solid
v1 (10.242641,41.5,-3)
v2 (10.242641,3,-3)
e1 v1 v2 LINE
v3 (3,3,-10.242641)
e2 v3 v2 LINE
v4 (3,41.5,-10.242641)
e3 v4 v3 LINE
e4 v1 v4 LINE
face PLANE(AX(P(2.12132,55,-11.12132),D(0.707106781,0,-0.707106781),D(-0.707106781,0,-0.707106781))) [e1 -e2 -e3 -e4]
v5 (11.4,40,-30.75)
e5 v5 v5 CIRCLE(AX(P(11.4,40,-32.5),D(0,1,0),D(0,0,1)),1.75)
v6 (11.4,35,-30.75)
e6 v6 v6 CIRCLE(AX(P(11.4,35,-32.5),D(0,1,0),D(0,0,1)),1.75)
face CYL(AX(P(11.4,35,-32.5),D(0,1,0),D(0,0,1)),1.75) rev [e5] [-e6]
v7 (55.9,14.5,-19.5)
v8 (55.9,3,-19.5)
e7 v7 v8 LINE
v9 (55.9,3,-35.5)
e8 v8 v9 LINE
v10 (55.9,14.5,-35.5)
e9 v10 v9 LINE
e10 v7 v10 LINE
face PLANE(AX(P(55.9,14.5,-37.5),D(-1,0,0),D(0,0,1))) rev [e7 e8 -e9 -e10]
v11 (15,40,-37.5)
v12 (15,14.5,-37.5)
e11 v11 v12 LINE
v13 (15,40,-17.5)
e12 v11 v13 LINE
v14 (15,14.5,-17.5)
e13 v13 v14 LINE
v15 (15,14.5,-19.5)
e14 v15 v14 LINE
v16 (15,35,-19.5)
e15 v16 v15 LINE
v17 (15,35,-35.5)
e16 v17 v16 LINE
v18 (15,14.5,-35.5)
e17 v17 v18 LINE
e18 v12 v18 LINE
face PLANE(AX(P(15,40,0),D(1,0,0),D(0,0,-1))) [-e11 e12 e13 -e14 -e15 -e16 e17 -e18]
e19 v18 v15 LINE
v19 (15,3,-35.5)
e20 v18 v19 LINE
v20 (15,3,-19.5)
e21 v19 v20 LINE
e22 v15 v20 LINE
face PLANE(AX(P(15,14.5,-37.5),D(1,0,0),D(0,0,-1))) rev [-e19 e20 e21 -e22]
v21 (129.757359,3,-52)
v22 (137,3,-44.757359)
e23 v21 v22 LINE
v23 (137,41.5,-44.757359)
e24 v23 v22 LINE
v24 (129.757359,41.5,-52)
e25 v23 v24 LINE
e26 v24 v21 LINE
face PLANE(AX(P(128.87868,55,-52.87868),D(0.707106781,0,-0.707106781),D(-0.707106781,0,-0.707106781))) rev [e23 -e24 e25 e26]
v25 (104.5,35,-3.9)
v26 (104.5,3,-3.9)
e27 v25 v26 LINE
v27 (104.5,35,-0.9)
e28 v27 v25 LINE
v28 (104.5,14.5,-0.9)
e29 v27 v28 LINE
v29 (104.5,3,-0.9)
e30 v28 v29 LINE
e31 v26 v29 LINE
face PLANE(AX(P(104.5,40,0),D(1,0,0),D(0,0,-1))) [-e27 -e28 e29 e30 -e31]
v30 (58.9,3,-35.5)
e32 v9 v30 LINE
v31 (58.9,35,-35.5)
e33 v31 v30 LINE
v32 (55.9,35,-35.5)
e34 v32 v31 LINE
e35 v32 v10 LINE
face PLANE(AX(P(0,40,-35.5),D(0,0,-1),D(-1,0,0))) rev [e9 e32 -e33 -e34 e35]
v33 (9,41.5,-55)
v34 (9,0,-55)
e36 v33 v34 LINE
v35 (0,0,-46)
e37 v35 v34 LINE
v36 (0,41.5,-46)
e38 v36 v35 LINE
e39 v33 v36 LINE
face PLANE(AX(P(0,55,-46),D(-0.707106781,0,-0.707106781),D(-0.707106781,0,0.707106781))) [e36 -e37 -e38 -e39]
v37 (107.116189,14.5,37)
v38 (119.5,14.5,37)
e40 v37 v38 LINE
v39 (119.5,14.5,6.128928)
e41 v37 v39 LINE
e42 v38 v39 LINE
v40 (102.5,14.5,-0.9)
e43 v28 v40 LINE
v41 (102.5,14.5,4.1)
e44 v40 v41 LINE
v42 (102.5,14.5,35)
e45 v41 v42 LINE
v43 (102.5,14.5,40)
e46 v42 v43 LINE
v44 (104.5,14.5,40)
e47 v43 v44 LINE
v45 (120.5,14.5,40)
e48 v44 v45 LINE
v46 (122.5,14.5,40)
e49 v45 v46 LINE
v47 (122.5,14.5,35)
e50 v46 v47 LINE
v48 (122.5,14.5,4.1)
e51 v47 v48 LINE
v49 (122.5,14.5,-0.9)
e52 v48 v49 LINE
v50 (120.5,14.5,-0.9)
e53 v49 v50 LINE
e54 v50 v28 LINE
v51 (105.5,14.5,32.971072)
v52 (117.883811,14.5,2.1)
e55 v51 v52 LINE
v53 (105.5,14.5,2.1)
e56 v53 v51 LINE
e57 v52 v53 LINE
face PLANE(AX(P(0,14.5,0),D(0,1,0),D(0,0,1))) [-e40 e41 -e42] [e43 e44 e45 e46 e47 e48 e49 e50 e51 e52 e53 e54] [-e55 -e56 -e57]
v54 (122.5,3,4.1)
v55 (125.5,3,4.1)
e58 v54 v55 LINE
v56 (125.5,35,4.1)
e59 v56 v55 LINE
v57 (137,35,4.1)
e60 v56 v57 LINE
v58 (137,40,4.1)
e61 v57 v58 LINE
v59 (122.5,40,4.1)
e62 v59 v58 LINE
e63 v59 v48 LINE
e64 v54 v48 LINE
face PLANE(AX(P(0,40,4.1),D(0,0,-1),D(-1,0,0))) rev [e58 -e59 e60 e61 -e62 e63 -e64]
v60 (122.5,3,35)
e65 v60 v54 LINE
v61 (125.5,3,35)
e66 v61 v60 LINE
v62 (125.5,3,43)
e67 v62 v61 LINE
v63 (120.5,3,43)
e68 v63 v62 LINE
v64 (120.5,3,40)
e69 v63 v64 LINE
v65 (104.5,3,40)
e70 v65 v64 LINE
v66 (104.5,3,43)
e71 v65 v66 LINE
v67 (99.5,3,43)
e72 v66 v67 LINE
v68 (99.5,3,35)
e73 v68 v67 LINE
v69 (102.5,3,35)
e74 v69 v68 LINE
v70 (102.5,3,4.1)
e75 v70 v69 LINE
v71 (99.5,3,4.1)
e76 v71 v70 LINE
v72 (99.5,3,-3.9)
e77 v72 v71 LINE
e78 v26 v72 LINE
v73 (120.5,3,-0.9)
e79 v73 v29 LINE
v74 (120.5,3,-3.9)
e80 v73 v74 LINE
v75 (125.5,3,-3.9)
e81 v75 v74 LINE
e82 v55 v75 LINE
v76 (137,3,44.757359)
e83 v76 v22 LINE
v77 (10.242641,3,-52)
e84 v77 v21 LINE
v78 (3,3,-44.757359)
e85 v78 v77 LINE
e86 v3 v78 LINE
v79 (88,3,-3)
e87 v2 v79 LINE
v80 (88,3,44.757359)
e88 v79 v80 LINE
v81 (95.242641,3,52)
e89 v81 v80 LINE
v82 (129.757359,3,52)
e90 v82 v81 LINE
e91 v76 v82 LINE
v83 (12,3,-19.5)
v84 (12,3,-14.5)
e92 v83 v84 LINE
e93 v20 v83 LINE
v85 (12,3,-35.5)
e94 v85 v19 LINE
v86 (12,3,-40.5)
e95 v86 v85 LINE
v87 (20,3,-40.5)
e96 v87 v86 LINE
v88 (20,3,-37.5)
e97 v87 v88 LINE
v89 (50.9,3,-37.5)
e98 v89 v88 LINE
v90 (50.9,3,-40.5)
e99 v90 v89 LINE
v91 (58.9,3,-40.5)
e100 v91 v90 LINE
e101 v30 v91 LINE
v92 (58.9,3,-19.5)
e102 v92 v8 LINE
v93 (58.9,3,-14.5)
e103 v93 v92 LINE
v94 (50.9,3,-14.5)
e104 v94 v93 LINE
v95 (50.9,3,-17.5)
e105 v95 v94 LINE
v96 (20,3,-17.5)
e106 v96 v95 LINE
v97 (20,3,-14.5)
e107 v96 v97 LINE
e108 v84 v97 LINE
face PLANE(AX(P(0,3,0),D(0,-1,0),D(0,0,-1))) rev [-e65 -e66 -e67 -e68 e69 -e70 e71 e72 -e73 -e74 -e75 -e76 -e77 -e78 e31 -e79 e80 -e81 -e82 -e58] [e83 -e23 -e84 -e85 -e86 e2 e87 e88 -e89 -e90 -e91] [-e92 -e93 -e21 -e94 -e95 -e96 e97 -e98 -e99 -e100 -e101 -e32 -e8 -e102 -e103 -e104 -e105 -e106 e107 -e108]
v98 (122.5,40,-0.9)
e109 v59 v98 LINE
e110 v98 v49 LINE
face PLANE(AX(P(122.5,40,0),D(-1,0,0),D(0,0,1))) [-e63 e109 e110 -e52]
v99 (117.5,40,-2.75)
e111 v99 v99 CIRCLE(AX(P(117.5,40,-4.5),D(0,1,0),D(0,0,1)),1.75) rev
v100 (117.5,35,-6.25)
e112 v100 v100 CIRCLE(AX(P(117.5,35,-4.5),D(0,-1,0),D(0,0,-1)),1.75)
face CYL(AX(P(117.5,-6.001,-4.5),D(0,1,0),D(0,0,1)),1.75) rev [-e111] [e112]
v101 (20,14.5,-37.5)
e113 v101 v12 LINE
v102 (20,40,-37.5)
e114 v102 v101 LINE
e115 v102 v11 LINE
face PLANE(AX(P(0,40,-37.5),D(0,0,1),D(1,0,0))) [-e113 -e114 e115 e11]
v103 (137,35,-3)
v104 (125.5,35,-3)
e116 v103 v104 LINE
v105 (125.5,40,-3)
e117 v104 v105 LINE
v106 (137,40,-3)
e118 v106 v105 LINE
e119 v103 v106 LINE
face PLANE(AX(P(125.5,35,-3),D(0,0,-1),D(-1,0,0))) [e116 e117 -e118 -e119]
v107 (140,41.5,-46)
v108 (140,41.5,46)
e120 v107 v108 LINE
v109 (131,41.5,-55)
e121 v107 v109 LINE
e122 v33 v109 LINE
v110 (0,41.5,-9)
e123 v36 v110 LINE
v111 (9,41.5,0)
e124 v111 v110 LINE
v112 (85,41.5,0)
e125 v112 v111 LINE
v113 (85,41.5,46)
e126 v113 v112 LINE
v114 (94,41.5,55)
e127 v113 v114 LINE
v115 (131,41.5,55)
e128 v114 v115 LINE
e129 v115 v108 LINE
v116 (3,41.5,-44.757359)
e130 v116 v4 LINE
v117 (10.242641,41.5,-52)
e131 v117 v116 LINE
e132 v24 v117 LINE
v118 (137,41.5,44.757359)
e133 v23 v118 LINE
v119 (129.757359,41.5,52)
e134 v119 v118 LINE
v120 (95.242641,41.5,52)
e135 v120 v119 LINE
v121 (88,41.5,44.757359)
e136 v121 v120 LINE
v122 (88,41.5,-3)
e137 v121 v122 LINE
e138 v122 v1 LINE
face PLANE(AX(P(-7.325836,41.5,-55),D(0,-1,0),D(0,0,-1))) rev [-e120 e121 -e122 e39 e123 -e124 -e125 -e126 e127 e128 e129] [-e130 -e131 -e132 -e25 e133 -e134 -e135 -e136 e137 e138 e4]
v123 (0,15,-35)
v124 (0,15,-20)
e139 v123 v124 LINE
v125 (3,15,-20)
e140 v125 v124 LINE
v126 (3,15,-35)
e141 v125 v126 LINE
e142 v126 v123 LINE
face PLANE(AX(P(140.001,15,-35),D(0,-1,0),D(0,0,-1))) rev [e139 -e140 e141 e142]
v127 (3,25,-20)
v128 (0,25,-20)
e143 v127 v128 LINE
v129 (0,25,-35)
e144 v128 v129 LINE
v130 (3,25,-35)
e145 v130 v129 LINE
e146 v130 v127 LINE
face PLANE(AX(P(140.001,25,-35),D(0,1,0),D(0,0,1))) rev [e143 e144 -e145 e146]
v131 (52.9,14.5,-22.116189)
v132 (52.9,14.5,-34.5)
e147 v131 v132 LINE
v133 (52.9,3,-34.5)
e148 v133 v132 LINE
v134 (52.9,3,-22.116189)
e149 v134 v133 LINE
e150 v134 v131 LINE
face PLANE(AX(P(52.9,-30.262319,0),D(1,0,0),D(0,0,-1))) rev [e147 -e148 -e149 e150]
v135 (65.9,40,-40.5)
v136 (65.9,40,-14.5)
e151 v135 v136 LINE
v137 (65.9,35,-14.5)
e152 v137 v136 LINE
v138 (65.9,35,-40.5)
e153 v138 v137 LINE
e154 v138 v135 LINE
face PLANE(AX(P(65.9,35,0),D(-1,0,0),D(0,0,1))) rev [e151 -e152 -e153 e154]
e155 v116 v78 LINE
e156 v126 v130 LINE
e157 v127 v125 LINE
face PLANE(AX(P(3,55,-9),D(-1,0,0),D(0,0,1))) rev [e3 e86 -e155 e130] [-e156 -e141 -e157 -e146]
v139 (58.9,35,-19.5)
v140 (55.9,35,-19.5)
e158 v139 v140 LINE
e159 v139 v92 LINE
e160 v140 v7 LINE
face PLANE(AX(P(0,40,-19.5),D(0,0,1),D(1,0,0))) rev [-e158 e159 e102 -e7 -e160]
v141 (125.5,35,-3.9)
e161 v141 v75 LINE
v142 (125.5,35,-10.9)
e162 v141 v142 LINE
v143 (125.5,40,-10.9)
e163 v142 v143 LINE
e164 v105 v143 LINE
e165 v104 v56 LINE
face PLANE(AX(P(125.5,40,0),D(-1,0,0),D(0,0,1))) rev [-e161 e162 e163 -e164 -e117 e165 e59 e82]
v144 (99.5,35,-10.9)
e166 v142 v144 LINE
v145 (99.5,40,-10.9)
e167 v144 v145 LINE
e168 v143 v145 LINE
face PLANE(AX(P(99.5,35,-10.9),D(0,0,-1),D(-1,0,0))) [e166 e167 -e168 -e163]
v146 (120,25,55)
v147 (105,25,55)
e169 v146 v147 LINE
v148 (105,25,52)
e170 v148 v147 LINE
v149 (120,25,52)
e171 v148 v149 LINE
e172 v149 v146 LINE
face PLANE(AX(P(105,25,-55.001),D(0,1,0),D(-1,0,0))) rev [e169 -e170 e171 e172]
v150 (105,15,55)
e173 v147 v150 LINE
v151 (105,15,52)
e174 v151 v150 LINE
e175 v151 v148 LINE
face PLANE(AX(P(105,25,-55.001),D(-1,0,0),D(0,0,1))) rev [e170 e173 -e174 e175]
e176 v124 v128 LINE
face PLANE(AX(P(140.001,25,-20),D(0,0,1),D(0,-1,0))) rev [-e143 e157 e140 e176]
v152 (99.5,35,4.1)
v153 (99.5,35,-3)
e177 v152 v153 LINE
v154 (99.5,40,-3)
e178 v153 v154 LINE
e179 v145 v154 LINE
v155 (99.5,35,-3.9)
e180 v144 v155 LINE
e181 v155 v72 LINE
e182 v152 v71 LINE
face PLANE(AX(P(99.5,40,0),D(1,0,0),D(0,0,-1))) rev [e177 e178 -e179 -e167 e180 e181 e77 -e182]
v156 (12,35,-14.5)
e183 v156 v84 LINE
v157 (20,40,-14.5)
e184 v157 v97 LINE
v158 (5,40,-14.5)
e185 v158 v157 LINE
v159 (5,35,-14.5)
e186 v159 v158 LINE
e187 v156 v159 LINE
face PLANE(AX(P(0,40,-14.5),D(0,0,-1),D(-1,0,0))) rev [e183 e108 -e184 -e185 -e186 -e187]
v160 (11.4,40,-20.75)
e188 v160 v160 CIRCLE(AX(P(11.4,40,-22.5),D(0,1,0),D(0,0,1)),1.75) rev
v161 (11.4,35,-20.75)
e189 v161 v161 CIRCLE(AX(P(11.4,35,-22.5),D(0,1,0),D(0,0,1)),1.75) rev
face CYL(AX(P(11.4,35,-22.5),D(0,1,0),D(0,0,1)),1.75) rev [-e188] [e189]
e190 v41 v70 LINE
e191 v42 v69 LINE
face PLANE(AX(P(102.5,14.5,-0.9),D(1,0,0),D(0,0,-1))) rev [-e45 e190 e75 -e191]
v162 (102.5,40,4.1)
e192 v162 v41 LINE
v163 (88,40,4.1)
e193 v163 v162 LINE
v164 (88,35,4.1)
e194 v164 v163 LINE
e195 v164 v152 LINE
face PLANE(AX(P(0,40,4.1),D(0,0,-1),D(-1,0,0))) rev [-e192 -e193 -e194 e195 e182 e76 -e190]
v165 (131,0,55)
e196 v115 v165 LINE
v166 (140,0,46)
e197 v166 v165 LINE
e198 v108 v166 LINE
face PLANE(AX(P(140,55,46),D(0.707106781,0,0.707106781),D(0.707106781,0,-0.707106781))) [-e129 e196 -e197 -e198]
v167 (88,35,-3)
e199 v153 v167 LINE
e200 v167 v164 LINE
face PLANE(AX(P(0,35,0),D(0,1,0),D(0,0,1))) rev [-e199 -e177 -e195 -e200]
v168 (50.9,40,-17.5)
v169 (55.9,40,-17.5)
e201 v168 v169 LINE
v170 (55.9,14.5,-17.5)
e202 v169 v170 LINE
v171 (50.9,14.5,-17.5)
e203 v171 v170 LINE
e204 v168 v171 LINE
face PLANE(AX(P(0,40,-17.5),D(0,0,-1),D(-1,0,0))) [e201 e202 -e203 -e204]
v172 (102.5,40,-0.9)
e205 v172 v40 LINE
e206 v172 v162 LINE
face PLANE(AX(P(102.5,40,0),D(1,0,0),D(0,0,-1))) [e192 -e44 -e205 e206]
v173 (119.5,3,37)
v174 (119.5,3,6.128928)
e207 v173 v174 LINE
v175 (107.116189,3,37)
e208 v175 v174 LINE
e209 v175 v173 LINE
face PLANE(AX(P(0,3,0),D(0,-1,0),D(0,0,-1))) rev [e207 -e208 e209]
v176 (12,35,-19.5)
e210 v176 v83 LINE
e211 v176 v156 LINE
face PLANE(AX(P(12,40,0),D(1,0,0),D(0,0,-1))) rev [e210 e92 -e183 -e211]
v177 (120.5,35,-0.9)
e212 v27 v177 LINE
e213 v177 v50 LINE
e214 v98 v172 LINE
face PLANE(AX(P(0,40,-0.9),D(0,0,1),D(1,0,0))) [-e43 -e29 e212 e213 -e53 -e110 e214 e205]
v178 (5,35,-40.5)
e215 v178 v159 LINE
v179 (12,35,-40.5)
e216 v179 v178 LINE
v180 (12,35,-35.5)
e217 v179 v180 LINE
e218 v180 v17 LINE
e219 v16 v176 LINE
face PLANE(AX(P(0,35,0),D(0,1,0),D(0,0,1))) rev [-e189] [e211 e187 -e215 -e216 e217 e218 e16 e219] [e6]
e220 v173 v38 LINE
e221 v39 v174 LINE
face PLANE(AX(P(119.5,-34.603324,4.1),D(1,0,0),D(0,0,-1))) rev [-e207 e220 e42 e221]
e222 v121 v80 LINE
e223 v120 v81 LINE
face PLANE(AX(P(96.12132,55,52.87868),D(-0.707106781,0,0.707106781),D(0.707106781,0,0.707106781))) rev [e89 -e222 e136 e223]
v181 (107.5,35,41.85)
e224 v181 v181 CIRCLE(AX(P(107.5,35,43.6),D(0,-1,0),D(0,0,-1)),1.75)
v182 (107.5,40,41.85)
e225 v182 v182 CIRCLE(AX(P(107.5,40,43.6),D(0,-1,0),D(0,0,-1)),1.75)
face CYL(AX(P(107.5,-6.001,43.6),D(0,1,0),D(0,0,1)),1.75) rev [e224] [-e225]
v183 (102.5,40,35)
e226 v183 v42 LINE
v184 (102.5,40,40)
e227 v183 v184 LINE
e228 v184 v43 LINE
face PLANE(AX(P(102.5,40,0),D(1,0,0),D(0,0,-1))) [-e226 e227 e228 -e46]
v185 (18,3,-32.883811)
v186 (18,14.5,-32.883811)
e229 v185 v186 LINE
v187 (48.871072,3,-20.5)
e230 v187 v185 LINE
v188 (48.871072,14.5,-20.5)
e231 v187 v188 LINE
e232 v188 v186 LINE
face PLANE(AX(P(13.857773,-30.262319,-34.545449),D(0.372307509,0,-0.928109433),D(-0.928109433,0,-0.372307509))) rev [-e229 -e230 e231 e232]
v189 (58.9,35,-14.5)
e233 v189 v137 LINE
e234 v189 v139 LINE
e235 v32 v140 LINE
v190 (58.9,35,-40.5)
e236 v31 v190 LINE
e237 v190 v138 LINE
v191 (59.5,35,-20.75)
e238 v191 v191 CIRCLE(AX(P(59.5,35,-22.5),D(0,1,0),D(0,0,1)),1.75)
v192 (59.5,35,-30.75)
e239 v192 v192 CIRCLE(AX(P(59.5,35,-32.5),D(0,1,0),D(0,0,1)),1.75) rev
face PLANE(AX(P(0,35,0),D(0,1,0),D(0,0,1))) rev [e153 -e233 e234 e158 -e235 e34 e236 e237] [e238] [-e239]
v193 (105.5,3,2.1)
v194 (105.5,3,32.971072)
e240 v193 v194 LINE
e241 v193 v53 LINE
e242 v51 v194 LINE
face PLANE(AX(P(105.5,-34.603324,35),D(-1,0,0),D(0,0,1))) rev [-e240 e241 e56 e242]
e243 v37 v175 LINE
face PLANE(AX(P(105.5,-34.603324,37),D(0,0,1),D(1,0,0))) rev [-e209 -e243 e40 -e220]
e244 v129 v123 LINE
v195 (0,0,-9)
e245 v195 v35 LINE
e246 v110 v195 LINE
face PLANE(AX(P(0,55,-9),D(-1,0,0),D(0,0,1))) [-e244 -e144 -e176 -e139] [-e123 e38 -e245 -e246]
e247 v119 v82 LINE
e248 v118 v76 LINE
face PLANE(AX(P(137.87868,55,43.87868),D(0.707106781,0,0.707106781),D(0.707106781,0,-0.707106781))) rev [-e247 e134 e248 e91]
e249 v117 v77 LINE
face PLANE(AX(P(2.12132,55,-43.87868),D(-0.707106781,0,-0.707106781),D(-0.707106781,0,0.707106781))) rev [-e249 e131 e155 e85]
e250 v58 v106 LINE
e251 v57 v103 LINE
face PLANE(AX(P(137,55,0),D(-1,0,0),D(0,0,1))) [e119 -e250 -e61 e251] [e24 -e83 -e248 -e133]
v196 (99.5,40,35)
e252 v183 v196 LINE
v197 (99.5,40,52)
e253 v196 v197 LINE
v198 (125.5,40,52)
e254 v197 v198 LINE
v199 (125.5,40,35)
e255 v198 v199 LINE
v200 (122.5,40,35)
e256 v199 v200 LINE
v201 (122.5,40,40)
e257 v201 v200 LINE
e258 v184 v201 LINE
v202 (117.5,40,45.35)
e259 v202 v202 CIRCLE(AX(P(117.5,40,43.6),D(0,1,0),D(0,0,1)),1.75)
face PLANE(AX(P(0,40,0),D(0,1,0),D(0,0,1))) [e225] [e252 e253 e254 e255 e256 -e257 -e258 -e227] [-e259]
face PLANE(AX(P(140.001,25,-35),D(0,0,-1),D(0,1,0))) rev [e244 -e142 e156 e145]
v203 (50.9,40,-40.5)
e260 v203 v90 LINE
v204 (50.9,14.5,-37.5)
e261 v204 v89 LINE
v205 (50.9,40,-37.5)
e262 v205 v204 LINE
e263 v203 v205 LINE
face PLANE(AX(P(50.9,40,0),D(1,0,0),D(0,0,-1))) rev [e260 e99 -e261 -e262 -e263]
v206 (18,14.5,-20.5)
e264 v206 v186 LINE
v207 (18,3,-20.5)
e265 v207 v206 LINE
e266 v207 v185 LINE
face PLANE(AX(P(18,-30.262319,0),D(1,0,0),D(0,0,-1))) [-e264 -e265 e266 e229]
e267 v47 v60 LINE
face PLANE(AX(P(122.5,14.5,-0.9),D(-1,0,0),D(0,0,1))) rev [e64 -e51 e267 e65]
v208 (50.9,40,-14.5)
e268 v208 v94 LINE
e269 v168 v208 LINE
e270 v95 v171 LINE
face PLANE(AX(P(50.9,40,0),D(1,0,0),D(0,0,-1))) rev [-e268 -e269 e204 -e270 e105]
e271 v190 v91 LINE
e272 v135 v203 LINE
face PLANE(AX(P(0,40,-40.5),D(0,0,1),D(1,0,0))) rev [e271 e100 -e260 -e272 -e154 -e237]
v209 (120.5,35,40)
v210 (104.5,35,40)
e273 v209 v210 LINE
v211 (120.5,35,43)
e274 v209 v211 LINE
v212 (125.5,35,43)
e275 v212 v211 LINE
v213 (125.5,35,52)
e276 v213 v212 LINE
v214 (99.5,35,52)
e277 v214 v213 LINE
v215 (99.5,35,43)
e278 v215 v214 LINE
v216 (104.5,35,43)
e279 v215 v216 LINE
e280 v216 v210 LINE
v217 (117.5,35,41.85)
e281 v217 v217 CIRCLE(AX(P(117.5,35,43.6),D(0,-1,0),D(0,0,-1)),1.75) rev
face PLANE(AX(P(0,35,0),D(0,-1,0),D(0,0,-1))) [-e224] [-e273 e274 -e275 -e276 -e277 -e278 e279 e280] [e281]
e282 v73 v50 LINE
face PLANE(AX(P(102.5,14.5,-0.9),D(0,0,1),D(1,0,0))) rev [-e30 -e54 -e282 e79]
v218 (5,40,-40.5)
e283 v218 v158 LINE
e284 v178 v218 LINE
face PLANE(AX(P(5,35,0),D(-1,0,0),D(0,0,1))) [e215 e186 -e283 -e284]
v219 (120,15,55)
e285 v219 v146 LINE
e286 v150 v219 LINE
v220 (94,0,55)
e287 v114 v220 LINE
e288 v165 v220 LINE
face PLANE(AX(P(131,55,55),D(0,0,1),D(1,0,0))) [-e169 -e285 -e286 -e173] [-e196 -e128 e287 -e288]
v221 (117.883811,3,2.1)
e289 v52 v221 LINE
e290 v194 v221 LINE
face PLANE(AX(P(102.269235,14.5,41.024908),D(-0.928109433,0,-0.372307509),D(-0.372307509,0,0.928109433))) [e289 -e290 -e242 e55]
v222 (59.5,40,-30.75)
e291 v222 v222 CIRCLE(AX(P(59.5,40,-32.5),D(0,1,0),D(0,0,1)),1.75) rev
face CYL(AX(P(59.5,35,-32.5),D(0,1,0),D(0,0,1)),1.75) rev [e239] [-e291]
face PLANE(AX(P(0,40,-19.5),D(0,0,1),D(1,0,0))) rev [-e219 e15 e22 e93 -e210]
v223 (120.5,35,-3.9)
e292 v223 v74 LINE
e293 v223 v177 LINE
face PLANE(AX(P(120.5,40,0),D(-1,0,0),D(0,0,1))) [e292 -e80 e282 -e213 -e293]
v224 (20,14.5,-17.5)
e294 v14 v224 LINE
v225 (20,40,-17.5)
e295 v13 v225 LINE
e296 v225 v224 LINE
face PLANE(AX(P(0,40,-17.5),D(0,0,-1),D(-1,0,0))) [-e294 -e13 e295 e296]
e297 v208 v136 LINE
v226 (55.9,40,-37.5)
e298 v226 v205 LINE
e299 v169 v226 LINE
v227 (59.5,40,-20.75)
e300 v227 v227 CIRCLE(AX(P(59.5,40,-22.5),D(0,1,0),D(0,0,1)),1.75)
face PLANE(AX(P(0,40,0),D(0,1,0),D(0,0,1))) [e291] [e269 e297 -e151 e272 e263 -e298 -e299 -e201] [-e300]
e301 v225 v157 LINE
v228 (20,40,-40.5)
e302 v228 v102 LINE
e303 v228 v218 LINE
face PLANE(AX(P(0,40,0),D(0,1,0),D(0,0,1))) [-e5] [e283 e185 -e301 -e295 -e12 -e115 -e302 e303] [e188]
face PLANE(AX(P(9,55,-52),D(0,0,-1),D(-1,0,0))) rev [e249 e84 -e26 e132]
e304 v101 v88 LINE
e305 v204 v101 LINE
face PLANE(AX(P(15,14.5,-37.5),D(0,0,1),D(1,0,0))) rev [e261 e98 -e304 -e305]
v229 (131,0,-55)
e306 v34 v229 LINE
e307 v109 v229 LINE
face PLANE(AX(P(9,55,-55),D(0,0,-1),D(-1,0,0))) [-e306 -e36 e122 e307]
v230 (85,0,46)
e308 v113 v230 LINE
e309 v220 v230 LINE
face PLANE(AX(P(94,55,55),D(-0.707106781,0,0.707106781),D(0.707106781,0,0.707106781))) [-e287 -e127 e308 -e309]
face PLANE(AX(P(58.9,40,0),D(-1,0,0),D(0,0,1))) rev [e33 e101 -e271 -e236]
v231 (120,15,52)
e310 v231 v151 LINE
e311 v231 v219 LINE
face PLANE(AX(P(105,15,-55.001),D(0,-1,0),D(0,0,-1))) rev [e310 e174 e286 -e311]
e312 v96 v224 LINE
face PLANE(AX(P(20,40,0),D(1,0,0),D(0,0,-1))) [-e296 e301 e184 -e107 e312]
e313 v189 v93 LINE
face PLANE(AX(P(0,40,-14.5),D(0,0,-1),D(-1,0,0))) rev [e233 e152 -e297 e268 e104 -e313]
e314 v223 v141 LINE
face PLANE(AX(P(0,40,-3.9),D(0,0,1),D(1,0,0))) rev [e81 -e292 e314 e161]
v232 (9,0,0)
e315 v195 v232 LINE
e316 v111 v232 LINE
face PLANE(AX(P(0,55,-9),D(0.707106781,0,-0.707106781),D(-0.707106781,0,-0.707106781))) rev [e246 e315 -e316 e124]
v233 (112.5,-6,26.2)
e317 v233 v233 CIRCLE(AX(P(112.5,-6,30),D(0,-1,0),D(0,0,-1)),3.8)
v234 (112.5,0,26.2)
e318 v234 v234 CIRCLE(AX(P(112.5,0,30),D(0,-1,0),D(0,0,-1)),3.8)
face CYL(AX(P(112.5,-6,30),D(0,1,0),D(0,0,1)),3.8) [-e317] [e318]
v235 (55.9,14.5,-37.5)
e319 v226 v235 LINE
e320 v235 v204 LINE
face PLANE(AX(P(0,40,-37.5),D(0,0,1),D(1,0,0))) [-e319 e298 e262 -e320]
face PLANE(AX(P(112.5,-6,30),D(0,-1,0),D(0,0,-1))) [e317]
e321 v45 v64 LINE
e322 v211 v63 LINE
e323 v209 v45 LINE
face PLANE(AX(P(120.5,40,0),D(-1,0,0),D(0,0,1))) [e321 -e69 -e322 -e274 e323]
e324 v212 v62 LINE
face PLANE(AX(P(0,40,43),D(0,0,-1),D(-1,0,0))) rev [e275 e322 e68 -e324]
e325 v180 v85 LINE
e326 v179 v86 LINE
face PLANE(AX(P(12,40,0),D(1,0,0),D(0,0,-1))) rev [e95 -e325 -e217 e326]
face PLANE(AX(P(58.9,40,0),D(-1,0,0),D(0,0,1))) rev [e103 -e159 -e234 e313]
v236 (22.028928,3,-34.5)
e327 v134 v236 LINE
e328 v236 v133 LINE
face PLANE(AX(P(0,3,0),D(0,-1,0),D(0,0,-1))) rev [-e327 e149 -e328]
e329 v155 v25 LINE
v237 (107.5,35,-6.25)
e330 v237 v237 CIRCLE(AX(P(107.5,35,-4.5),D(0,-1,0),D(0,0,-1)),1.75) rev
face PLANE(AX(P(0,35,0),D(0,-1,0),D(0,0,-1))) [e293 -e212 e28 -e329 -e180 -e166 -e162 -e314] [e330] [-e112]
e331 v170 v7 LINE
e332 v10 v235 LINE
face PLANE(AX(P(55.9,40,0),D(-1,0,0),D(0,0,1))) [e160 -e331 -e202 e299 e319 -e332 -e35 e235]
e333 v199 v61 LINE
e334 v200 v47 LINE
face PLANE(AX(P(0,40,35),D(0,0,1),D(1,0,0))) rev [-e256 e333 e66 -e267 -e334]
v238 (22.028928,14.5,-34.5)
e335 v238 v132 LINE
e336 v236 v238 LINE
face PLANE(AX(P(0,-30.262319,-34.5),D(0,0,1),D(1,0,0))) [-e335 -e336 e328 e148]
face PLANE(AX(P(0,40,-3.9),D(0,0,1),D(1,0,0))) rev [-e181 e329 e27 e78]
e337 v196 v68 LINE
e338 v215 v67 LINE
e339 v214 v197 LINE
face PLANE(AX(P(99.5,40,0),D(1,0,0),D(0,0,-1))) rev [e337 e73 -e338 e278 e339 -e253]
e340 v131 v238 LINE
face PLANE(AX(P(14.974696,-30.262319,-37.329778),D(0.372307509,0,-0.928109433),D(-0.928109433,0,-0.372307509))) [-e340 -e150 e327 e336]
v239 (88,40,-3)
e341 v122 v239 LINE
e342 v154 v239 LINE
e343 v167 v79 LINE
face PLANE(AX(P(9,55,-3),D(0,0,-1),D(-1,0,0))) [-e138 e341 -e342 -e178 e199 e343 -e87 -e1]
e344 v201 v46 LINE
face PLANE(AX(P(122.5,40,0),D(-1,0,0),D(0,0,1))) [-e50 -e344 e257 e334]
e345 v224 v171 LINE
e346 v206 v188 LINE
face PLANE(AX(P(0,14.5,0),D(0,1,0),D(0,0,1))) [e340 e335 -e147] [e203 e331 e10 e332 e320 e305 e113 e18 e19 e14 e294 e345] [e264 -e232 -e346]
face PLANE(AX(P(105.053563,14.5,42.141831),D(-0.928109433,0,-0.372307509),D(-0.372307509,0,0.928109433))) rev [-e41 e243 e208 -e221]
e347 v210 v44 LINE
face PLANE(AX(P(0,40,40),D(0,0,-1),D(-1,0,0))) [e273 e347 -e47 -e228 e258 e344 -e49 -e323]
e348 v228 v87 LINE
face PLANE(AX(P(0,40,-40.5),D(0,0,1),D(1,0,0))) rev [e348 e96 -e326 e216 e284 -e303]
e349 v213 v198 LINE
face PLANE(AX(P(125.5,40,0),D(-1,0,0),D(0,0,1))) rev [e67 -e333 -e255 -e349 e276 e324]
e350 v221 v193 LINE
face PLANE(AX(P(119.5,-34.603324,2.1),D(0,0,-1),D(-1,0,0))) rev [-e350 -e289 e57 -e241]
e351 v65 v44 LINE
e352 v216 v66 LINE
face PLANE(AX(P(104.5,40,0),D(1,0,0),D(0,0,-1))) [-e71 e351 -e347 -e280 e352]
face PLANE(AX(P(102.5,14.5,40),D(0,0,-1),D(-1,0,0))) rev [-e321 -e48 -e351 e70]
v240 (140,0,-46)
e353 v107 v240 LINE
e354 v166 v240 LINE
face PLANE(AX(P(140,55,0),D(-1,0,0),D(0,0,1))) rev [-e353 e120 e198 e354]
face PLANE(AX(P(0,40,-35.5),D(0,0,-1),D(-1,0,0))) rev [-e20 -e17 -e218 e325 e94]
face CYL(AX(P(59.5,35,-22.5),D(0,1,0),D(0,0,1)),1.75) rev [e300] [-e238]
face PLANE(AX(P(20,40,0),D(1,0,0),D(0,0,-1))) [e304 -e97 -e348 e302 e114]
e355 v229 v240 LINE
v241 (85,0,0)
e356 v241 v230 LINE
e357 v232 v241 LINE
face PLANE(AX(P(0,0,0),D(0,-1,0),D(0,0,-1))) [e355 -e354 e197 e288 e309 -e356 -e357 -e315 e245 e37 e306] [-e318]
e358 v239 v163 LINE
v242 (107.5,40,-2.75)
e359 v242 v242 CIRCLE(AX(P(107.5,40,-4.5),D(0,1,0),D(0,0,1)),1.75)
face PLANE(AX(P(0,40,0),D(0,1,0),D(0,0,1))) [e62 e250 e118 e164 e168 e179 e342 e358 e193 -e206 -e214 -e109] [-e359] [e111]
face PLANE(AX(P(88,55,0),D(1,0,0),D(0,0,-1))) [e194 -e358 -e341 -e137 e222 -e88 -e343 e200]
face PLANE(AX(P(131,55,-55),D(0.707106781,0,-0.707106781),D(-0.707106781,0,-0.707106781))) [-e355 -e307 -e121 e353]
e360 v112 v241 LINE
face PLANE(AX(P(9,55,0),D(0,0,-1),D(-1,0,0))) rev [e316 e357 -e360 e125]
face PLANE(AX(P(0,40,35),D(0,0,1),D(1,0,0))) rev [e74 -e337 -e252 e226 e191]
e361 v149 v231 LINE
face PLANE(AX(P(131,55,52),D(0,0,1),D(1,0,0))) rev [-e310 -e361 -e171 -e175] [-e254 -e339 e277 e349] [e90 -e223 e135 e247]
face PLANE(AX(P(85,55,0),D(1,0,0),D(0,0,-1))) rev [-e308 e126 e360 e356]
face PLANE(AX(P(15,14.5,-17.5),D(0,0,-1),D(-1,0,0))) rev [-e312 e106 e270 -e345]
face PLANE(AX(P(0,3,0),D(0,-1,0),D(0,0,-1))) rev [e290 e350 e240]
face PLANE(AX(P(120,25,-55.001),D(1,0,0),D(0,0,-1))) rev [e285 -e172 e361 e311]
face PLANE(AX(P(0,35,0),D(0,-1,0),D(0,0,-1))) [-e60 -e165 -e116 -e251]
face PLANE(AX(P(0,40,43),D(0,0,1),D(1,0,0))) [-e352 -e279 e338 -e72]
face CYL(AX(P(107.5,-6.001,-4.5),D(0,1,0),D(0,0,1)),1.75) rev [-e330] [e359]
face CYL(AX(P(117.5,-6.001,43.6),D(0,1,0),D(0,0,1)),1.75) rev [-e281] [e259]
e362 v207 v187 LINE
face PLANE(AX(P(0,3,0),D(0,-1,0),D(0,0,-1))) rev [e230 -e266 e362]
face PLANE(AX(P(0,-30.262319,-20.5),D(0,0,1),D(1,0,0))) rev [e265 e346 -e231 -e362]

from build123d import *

# Parameters (mm, degrees)
BOSS_EXTRUDE1_DEPTH     = 55
SHELL1_START            = 3
SHELL1_DEPTH            = 49
CUT_EXTRUDE1_DEPTH      = 161.15617378
CUT_EXTRUDE1_DEPTH_BACK = 161.15617378
SKETCH4_W               = 154.651671352
SKETCH4_H               = 22.597591031
SKETCH6_R               = 3.8
BOSS_EXTRUDE2_DEPTH     = 6
BOSS_EXTRUDE3_DEPTH     = 37
SKETCH9_W               = 26
SKETCH9_H               = 10
BOSS_EXTRUDE4_DEPTH     = 5
CUT_EXTRUDE3_REACH      = 159.293
SKETCH10_R              = 1.75
SKETCH11_W              = 26
SKETCH11_H              = 2
SKETCH11_W_2            = 11.5
SKETCH11_H_2            = 7.1
BOSS_EXTRUDE5_DEPTH     = 5
CUT_EXTRUDE4_REACH      = 184.818
SKETCH12_W              = 15
SKETCH12_H              = 10
SKETCH13_W              = 20
SKETCH13_H              = 40.9
BOSS_EXTRUDE6_DEPTH     = 11.5
CUT_EXTRUDE5_DEPTH      = 11.5
BOSS_EXTRUDE7_DEPTH     = 11.5
CUT_EXTRUDE6_REACH      = 158.036
SKETCH16_W              = 15
SKETCH16_H              = 10
BOSS_EXTRUDE8_DEPTH     = 37
BOSS_EXTRUDE9_DEPTH     = 5
SKETCH20_W              = 40.9
SKETCH20_H              = 20
BOSS_EXTRUDE10_DEPTH    = 11.5
CUT_EXTRUDE7_DEPTH      = 11.5


# Read off the part's stored shape, not the designer's step: Shell1
with BuildPart() as part:
    # Sketch2 → Boss-Extrude1 (new body)
    with BuildSketch(Plane(origin=(0, 0, 0), x_dir=(1, 0, 0), z_dir=(0, 1, 0))):
        Polygon((9, 55), (0, 46), (0, 9), (9, 0), (85, 0), (140, 0), (140, 46), (131, 55), align=None)
        Polygon((140, 0), (85, 0), (85, -46), (94, -55), (131, -55), (140, -46), align=None)
    extrude(amount=BOSS_EXTRUDE1_DEPTH)

    # Shell1 outline → Shell1 (cut)
    with BuildSketch(Plane(origin=(0, 0, 0), x_dir=(1, 0, 0), z_dir=(0, 1, 0)).offset(SHELL1_START)):
        Polygon((10.242640687, 3), (88, 3), (88, -44.757359313), (95.242640687, -52), (129.757359313, -52), (137, -44.757359313), (137, 44.757359313), (129.757359313, 52), (10.242640687, 52), (3, 44.757359313), (3, 10.242640687), align=None)
    extrude(amount=SHELL1_DEPTH, mode=Mode.SUBTRACT)

    # Sketch4 → Cut-Extrude1 (cut, two sides: drawn at the far end of the back side and taken through both)
    with BuildSketch(Plane.XY.offset(-CUT_EXTRUDE1_DEPTH_BACK)):
        with Locations((70, 52.798795516)):
            Rectangle(SKETCH4_W, SKETCH4_H)
    extrude(amount=CUT_EXTRUDE1_DEPTH + CUT_EXTRUDE1_DEPTH_BACK, mode=Mode.SUBTRACT)

    # Sketch6 → Boss-Extrude2 (add)
    with BuildSketch(Plane.XZ):
        with Locations(Location((112.5, 30, 0), (0, 0, 270))):
            Circle(SKETCH6_R)
    extrude(amount=BOSS_EXTRUDE2_DEPTH)

    # Sketch8 → Boss-Extrude3 (add)
    with BuildSketch(Plane(origin=(0, 3, 0), x_dir=(1, 0, 0), z_dir=(0, 1, 0))):
        Polygon((102.5, -35), (99.5, -35), (99.5, -43), (104.5, -43), (104.5, -40), (102.5, -40), align=None)
        Polygon((99.5, 3.9), (99.5, -4.1), (102.5, -4.1), (102.5, 0.9), (104.5, 0.9), (104.5, 3.9), align=None)
        Polygon((120.5, -40), (120.5, -43), (125.5, -43), (125.5, -35), (122.5, -35), (122.5, -40), align=None)
        Polygon((125.5, 3.9), (120.5, 3.9), (120.5, 0.9), (122.5, 0.9), (122.5, -4.1), (125.5, -4.1), align=None)
    extrude(amount=BOSS_EXTRUDE3_DEPTH)

    # Sketch9 → Boss-Extrude4 (add)
    with BuildSketch(Plane(origin=(0, 40, 0), x_dir=(1, 0, 0), z_dir=(0, 1, 0))):
        with Locations((112.5, 5.9)):
            Rectangle(SKETCH9_W, SKETCH9_H)
        with Locations((112.5, -45)):
            Rectangle(SKETCH9_W, SKETCH9_H)
    extrude(amount=-BOSS_EXTRUDE4_DEPTH)

    # Sketch10 → Cut-Extrude3 (cut, up to next)
    with BuildSketch(Plane(origin=(0, 40, 0), x_dir=(1, 0, 0), z_dir=(0, 1, 0)), mode=Mode.PRIVATE) as cut_extrude3_sk1:
        with Locations(Location((107.5, 4.5, 0), (0, 0, 270))):
            Circle(SKETCH10_R)
    cut_extrude3_tool1 = extrude(cut_extrude3_sk1.sketch, amount=-CUT_EXTRUDE3_REACH, mode=Mode.PRIVATE) & part.part
    # Sketch10 → Cut-Extrude3 (cut, up to next)
    with BuildSketch(Plane(origin=(0, 40, 0), x_dir=(1, 0, 0), z_dir=(0, 1, 0)), mode=Mode.PRIVATE) as cut_extrude3_sk2:
        with Locations(Location((117.5, 4.5, 0), (0, 0, 270))):
            Circle(SKETCH10_R)
    cut_extrude3_tool2 = extrude(cut_extrude3_sk2.sketch, amount=-CUT_EXTRUDE3_REACH, mode=Mode.PRIVATE) & part.part
    # Sketch10 → Cut-Extrude3 (cut, up to next)
    with BuildSketch(Plane(origin=(0, 40, 0), x_dir=(1, 0, 0), z_dir=(0, 1, 0)), mode=Mode.PRIVATE) as cut_extrude3_sk3:
        with Locations(Location((117.5, -43.6, 0), (0, 0, 270))):
            Circle(SKETCH10_R)
    cut_extrude3_tool3 = extrude(cut_extrude3_sk3.sketch, amount=-CUT_EXTRUDE3_REACH, mode=Mode.PRIVATE) & part.part
    # Sketch10 → Cut-Extrude3 (cut, up to next)
    with BuildSketch(Plane(origin=(0, 40, 0), x_dir=(1, 0, 0), z_dir=(0, 1, 0)), mode=Mode.PRIVATE) as cut_extrude3_sk4:
        with Locations(Location((107.5, -43.6, 0), (0, 0, 90))):
            Circle(SKETCH10_R)
    cut_extrude3_tool4 = extrude(cut_extrude3_sk4.sketch, amount=-CUT_EXTRUDE3_REACH, mode=Mode.PRIVATE) & part.part
    add(cut_extrude3_tool1.solids().sort_by_distance((107.5, 40, -4.5))[0], mode=Mode.SUBTRACT)
    add(cut_extrude3_tool2.solids().sort_by_distance((117.5, 40, -4.5))[0], mode=Mode.SUBTRACT)
    add(cut_extrude3_tool3.solids().sort_by_distance((117.5, 40, 43.6))[0], mode=Mode.SUBTRACT)
    add(cut_extrude3_tool4.solids().sort_by_distance((107.5, 40, 43.6))[0], mode=Mode.SUBTRACT)

    # Sketch11 → Boss-Extrude5 (add)
    with BuildSketch(Plane(origin=(0, 40, 0), x_dir=(1, 0, 0), z_dir=(0, 1, 0))):
        with Locations((112.5, -51)):
            Rectangle(SKETCH11_W, SKETCH11_H)
        with Locations((93.75, -0.55)):
            Rectangle(SKETCH11_W_2, SKETCH11_H_2)
        with Locations((131.25, -0.55)):
            Rectangle(SKETCH11_W_2, SKETCH11_H_2)
    extrude(amount=-BOSS_EXTRUDE5_DEPTH)

    # Sketch12 → Cut-Extrude4 (cut, up to next)
    with BuildSketch(Plane.XY.offset(55), mode=Mode.PRIVATE) as cut_extrude4_sk1:
        with Locations((112.5, 20)):
            Rectangle(SKETCH12_W, SKETCH12_H)
    cut_extrude4_tool1 = extrude(cut_extrude4_sk1.sketch, amount=-CUT_EXTRUDE4_REACH, mode=Mode.PRIVATE) & part.part
    add(cut_extrude4_tool1.solids().sort_by_distance((112.5, 20, 55))[0], mode=Mode.SUBTRACT)

    # Sketch13 → Boss-Extrude6 (add)
    with BuildSketch(Plane(origin=(0, 3, 0), x_dir=(1, 0, 0), z_dir=(0, 1, 0))):
        with Locations((112.5, -19.55)):
            Rectangle(SKETCH13_W, SKETCH13_H)
    extrude(amount=BOSS_EXTRUDE6_DEPTH)

    # Sketch14 → Cut-Extrude5 (cut)
    with BuildSketch(Plane(origin=(0, 14.5, 0), x_dir=(1, 0, 0), z_dir=(0, 1, 0))):
        Polygon((105.5, -2.1), (105.5, -4.1), (105.5, -35), (105.5, -37), (119.5, -37), (119.5, -35), (119.5, -4.1), (119.5, -2.1), align=None)
    extrude(amount=-CUT_EXTRUDE5_DEPTH, mode=Mode.SUBTRACT)

    # Sketch15 → Boss-Extrude7 (add)
    with BuildSketch(Plane(origin=(0, 3, 0), x_dir=(1, 0, 0), z_dir=(0, 1, 0))):
        Polygon((112.5, -19.55), (119.5, -2.1), (117.883811276, -2.1), (111.107835851, -18.991538737), align=None)
        Polygon((119.5, -6.128927606), (119.5, -2.1), (112.5, -19.55), (113.892164149, -20.108461263), align=None)
        Polygon((105.5, -37), (112.5, -19.55), (111.107835851, -18.991538737), (105.5, -32.971072394), align=None)
        Polygon((113.892164149, -20.108461263), (112.5, -19.55), (105.5, -37), (107.116188724, -37), align=None)
    extrude(amount=BOSS_EXTRUDE7_DEPTH)

    # Sketch16 → Cut-Extrude6 (cut, up to next)
    with BuildSketch(Plane.ZY, mode=Mode.PRIVATE) as cut_extrude6_sk1:
        with Locations((-27.5, 20)):
            Rectangle(SKETCH16_W, SKETCH16_H)
    cut_extrude6_tool1 = extrude(cut_extrude6_sk1.sketch, amount=-CUT_EXTRUDE6_REACH, mode=Mode.PRIVATE) & part.part
    add(cut_extrude6_tool1.solids().sort_by_distance((0, 20, -27.5))[0], mode=Mode.SUBTRACT)

    # Sketch18 → Boss-Extrude8 (add)
    with BuildSketch(Plane(origin=(0, 3, 0), x_dir=(1, 0, 0), z_dir=(0, 1, 0))):
        Polygon((15, 37.5), (20, 37.5), (20, 40.5), (12, 40.5), (12, 35.5), (15, 35.5), align=None)
        Polygon((55.9, 37.5), (55.9, 35.5), (58.9, 35.5), (58.9, 40.5), (50.9, 40.5), (50.9, 37.5), align=None)
        Polygon((55.9, 19.5), (55.9, 17.5), (50.9, 17.5), (50.9, 14.5), (58.9, 14.5), (58.9, 19.5), align=None)
        Polygon((20, 14.5), (20, 17.5), (15, 17.5), (15, 19.5), (12, 19.5), (12, 14.5), align=None)
    extrude(amount=BOSS_EXTRUDE8_DEPTH)

    # Sketch19 → Boss-Extrude9 (add)
    # profile 1 of 3: a face of its own
    with BuildSketch(Plane(origin=(0, 40, 0), x_dir=(1, 0, 0), z_dir=(0, 1, 0))):
        Polygon((12, 35.5), (12, 40.5), (5, 40.5), (5, 14.5), (12, 14.5), (12, 19.5), (15, 19.5), (15, 35.5), align=None)
        with BuildLine():
            ThreePointArc((13.15, 22.5), (10.162563133, 21.262563133), (11.4, 24.25))
            ThreePointArc((11.4, 24.25), (12.637436867, 23.737436867), (13.15, 22.5))
        make_face(mode=Mode.SUBTRACT)
        with BuildLine():
            ThreePointArc((13.15, 32.5), (12.637436867, 31.262563133), (11.4, 30.75))
            ThreePointArc((11.4, 30.75), (10.162563133, 33.737436867), (13.15, 32.5))
        make_face(mode=Mode.SUBTRACT)
    # profile 2 of 3: a face of its own
    with BuildSketch(Plane(origin=(0, 40, 0), x_dir=(1, 0, 0), z_dir=(0, 1, 0))):
        Polygon((15, 37.5), (15, 40.5), (12, 40.5), (12, 35.5), (15, 35.5), align=None)
    # profile 3 of 3: a face of its own
    with BuildSketch(Plane(origin=(0, 40, 0), x_dir=(1, 0, 0), z_dir=(0, 1, 0))):
        Polygon((58.9, 19.5), (58.9, 14.5), (65.9, 14.5), (65.9, 40.5), (58.9, 40.5), (58.9, 35.5), (55.9, 35.5), (55.9, 19.5), align=None)
        with BuildLine():
            ThreePointArc((61.25, 22.5), (58.262563133, 21.262563133), (59.5, 24.25))
            ThreePointArc((59.5, 24.25), (60.737436867, 23.737436867), (61.25, 22.5))
        make_face(mode=Mode.SUBTRACT)
        with BuildLine():
            ThreePointArc((61.25, 32.5), (60.737436867, 31.262563133), (59.5, 30.75))
            ThreePointArc((59.5, 30.75), (58.262563133, 33.737436867), (61.25, 32.5))
        make_face(mode=Mode.SUBTRACT)
    extrude(amount=-BOSS_EXTRUDE9_DEPTH)

    # Sketch20 → Boss-Extrude10 (add)
    with BuildSketch(Plane(origin=(0, 3, 0), x_dir=(1, 0, 0), z_dir=(0, 1, 0))):
        with Locations((35.45, 27.5)):
            Rectangle(SKETCH20_W, SKETCH20_H)
    extrude(amount=BOSS_EXTRUDE10_DEPTH)

    # Sketch21 → Cut-Extrude7 (cut)
    with BuildSketch(Plane(origin=(0, 14.5, 0), x_dir=(1, 0, 0), z_dir=(0, 1, 0))):
        Polygon((18, 32.883811276), (18, 20.5), (48.871072394, 20.5), (34.891538737, 26.107835851), align=None)
        Polygon((52.9, 34.5), (22.028927606, 34.5), (36.008461263, 28.892164149), (52.9, 22.116188724), align=None)
    extrude(amount=-CUT_EXTRUDE7_DEPTH, mode=Mode.SUBTRACT)


solid = part.part
